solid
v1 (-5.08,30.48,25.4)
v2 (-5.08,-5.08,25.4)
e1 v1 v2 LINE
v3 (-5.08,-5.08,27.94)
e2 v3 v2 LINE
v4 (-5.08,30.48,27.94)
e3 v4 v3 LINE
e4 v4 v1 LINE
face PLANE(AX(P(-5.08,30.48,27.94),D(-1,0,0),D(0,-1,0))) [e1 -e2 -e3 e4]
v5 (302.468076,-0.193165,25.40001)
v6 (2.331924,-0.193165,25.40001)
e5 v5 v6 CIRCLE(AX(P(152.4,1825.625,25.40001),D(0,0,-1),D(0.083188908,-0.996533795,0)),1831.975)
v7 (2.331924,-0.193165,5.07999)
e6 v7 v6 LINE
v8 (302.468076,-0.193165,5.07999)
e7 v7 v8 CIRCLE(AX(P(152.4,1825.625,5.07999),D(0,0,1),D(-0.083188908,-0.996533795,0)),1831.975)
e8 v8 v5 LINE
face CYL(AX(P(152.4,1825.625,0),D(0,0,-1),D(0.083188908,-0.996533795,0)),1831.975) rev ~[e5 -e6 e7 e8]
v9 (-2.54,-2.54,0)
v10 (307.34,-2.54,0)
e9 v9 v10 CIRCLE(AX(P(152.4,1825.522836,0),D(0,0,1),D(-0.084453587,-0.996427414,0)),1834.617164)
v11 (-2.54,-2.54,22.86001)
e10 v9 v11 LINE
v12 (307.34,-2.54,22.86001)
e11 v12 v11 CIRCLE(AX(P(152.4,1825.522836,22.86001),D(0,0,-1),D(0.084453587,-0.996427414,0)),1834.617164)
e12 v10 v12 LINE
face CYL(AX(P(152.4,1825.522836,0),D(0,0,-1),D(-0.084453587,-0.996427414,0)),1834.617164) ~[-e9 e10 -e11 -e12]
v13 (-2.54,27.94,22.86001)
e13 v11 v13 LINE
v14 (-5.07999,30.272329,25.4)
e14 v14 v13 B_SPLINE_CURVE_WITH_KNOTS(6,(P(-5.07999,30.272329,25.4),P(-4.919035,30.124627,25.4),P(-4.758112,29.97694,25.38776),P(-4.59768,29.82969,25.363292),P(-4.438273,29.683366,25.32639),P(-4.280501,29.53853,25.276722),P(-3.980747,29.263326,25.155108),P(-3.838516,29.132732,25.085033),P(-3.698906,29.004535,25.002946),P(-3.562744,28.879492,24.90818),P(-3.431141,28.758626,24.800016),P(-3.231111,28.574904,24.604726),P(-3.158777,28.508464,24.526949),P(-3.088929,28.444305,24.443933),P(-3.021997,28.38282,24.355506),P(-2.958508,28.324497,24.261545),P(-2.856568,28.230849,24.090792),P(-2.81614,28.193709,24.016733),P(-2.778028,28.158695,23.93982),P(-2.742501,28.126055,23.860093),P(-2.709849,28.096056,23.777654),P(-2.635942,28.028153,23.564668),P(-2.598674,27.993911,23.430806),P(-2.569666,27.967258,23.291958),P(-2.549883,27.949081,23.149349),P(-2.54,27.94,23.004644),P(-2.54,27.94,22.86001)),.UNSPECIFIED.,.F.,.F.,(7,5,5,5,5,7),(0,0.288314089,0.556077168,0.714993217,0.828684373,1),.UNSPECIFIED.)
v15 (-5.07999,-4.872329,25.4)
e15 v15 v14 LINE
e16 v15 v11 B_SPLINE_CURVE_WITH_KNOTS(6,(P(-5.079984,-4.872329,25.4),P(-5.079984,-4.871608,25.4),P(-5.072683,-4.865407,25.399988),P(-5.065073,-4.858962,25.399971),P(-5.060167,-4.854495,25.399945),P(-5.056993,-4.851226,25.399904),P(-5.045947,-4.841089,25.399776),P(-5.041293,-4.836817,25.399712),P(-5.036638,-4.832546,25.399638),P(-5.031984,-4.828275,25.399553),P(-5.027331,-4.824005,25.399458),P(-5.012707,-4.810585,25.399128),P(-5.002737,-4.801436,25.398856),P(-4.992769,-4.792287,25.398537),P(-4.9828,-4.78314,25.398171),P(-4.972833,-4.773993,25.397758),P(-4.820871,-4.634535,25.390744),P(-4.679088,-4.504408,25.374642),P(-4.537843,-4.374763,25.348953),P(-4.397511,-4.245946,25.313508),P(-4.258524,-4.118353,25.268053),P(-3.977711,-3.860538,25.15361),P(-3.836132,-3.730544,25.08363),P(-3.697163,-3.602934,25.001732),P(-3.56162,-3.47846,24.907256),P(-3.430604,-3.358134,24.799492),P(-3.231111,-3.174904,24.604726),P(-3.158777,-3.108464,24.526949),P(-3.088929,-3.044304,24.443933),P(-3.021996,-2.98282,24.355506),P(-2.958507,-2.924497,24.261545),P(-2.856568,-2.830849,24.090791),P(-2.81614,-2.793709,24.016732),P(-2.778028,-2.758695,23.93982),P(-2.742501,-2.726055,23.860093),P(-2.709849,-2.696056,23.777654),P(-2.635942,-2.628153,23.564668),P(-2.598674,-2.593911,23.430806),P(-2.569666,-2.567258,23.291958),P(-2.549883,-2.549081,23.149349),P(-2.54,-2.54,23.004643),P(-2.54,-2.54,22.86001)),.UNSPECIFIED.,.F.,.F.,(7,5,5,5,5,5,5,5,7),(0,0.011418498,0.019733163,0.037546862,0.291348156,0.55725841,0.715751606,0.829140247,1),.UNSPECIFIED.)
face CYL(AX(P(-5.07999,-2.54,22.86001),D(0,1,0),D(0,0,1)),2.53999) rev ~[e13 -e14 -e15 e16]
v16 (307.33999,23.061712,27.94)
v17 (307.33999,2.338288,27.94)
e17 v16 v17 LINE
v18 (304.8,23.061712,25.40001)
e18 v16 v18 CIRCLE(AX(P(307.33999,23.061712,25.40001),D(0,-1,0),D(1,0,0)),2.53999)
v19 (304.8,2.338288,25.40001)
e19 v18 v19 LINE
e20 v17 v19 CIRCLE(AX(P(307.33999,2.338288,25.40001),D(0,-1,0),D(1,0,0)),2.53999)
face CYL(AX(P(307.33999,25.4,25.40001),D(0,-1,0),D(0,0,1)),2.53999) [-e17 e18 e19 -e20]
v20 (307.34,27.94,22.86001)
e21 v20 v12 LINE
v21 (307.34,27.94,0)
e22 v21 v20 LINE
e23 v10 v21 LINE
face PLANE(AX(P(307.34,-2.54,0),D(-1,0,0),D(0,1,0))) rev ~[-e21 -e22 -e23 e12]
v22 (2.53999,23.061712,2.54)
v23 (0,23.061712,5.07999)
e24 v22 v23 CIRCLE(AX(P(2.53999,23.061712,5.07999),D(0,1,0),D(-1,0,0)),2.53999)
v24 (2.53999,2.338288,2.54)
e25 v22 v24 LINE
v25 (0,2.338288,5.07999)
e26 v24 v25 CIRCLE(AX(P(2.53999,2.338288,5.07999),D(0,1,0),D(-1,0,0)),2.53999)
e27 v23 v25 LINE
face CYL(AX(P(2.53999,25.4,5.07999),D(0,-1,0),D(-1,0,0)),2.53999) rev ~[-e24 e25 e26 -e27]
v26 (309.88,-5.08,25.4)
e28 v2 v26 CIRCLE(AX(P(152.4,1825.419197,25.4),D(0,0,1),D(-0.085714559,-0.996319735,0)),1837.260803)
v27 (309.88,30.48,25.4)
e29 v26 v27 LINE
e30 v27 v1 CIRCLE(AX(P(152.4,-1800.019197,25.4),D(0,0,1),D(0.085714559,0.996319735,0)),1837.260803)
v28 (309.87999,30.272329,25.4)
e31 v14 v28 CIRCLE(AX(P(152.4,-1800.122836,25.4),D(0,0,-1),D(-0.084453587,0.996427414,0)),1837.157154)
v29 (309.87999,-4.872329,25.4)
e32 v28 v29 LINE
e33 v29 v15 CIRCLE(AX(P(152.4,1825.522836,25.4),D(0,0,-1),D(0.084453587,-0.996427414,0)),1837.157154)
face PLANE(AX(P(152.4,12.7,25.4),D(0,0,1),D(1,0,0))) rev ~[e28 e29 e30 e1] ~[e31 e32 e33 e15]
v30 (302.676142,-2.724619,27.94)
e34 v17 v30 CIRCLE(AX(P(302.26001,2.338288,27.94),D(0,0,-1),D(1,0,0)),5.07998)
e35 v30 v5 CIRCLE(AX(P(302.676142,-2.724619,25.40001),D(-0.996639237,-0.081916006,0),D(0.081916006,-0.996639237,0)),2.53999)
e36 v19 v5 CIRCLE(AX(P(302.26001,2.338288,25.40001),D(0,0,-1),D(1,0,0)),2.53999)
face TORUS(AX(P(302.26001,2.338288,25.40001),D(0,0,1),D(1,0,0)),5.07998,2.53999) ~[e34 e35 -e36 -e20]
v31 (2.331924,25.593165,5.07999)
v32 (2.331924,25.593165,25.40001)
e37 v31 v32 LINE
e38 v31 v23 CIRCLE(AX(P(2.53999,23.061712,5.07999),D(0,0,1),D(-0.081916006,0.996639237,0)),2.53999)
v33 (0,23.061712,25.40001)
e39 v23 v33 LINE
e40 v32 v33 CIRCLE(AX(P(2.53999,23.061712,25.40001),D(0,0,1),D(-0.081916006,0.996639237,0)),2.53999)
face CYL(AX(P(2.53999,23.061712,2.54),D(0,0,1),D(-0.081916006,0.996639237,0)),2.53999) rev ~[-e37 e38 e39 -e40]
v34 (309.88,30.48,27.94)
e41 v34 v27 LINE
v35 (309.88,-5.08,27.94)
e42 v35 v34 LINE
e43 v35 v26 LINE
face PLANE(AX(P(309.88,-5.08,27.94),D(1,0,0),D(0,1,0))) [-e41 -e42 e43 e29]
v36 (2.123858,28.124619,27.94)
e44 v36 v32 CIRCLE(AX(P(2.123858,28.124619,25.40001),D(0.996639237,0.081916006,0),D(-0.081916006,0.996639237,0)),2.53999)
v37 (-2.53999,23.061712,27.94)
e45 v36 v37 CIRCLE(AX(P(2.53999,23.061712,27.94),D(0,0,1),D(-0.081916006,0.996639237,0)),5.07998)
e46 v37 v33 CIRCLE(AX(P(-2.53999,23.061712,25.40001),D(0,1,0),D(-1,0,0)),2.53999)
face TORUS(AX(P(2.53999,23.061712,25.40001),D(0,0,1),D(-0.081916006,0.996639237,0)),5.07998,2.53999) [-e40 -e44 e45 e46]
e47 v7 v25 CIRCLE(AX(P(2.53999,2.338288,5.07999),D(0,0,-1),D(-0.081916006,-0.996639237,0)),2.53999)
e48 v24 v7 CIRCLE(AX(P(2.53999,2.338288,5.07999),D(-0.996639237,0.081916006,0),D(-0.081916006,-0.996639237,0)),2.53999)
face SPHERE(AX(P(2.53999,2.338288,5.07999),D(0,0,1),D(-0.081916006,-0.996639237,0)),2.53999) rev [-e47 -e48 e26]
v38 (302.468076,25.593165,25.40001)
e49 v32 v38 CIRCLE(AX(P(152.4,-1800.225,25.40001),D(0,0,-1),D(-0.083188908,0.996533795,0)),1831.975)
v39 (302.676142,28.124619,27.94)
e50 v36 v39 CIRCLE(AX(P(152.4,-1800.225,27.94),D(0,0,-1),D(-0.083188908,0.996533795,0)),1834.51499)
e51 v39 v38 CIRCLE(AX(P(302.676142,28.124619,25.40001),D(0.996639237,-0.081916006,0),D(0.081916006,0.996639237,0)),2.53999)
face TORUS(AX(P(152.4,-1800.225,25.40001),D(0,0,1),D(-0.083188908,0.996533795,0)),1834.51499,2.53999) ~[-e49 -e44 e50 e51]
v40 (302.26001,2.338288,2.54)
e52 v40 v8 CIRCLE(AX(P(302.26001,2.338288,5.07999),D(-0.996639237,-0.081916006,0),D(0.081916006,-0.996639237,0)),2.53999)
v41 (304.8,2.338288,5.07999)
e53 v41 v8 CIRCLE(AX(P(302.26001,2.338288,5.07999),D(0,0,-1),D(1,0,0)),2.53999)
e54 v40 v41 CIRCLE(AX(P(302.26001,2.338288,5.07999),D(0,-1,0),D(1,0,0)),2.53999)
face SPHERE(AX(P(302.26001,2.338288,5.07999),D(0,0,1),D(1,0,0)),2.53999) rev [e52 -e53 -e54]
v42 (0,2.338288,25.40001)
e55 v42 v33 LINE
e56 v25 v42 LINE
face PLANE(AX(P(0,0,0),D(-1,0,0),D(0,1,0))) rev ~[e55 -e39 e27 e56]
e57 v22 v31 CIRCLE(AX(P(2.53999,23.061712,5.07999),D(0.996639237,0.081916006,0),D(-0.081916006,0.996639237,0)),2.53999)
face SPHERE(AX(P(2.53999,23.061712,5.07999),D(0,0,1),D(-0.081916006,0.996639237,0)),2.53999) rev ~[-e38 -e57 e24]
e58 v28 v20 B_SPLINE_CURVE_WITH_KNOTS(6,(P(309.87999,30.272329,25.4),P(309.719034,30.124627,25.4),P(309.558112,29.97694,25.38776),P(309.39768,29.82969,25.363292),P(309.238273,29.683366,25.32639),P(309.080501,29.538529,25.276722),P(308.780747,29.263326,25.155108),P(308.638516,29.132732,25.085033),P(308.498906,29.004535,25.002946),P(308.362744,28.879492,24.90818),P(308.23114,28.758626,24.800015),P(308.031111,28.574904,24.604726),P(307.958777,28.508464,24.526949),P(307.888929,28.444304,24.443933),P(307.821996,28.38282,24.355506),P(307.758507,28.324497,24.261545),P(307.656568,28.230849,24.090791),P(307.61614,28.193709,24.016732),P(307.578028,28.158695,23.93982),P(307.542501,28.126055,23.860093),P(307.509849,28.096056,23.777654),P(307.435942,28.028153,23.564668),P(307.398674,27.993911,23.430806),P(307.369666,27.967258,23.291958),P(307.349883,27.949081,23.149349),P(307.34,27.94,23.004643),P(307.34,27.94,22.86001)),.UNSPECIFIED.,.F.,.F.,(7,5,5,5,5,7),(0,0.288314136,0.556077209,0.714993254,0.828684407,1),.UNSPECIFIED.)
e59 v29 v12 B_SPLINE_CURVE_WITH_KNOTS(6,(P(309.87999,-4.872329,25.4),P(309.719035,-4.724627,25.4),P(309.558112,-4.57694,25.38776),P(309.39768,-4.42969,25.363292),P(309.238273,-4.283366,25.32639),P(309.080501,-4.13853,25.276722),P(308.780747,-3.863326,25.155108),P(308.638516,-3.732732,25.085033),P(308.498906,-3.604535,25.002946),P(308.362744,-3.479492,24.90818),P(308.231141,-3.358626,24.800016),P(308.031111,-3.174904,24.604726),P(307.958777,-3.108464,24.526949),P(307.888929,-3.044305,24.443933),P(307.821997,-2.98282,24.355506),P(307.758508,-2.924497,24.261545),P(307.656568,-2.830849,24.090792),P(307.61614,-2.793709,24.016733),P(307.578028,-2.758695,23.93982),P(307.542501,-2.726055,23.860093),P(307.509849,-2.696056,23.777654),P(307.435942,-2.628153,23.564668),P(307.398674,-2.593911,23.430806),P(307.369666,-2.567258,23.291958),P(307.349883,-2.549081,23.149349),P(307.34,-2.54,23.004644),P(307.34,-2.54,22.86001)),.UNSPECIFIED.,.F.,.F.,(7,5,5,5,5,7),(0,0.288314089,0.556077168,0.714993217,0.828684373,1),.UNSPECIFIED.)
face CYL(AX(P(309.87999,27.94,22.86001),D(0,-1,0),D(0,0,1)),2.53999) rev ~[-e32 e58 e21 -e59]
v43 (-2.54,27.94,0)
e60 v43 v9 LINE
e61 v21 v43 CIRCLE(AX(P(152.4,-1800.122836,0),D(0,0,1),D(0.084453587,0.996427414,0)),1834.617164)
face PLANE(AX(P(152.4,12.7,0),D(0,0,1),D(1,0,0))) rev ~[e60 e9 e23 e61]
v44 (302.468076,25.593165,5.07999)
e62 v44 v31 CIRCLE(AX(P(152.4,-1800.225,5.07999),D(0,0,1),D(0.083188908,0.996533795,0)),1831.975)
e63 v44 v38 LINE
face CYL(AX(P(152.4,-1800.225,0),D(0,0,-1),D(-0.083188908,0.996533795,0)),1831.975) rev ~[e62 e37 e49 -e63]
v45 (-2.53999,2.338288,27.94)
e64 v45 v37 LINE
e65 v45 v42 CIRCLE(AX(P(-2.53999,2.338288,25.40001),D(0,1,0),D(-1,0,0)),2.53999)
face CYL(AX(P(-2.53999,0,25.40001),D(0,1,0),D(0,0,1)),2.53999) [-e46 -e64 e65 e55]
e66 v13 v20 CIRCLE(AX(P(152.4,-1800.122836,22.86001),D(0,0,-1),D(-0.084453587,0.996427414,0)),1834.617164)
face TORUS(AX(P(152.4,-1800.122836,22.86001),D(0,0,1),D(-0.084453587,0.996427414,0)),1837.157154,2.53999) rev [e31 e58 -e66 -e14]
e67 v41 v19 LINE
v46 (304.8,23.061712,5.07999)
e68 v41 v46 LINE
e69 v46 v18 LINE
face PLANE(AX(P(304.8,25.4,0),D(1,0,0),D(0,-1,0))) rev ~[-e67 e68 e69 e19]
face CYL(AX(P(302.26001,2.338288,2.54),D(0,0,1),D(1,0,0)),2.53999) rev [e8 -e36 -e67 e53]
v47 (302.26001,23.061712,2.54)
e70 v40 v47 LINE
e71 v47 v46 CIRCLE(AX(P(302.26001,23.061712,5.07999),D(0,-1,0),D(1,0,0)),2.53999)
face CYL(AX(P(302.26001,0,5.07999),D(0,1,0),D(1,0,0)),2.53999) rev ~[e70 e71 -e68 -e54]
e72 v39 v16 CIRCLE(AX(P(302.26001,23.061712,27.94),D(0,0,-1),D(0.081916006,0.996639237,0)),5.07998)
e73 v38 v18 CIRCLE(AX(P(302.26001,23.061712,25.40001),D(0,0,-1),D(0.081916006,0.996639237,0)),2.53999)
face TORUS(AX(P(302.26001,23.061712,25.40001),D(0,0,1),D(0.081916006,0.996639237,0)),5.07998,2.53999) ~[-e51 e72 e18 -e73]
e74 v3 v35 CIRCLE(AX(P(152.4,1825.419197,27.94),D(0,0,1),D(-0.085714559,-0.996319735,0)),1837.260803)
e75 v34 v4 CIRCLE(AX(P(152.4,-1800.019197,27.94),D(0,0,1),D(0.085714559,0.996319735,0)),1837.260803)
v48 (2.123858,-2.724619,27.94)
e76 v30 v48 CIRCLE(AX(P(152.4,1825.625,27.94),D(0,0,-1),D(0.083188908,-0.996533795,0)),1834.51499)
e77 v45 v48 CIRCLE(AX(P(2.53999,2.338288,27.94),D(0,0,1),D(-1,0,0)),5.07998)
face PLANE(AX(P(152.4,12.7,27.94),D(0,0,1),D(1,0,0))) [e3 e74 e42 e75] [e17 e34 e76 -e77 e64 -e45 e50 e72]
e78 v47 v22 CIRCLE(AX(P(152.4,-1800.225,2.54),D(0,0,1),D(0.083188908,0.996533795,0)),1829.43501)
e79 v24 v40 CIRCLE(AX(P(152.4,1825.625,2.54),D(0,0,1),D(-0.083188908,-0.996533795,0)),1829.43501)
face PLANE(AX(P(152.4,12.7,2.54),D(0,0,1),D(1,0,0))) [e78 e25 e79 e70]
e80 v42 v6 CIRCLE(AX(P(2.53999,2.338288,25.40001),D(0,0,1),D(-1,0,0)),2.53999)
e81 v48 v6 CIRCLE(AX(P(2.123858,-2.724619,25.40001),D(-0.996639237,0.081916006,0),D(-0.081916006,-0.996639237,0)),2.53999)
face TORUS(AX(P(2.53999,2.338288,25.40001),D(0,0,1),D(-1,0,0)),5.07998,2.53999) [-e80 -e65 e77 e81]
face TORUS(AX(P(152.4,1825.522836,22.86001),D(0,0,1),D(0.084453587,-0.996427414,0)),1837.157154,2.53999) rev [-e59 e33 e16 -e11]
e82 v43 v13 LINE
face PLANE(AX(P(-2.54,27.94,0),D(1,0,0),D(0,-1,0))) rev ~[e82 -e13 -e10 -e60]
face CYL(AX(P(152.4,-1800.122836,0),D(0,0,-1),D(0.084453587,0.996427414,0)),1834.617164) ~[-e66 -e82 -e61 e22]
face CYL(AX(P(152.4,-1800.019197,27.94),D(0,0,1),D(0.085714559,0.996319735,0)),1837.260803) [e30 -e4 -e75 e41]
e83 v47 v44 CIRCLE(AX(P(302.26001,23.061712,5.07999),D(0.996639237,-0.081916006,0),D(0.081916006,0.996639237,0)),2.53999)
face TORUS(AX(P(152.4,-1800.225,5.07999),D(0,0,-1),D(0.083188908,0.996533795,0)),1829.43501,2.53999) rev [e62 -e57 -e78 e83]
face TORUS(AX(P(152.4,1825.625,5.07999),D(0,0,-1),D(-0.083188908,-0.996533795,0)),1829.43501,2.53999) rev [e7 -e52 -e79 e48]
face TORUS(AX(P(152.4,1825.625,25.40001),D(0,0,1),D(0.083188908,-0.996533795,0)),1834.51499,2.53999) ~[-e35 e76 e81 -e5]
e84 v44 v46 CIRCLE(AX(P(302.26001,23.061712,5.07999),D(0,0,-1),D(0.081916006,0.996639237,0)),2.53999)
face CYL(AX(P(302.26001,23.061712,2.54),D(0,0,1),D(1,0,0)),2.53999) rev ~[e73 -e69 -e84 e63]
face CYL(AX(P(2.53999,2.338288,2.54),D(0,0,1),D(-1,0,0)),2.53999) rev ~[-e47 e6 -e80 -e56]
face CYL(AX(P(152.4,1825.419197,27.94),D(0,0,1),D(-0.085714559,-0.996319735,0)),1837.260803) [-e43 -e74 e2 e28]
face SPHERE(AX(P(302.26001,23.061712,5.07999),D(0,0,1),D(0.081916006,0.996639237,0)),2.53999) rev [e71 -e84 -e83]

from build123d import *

# Parameters (mm, degrees)
F1_DEPTH = 2.54
F2_DEPTH = 27.94
F4_DEPTH = 2.54
F5_R     = 2.53999


# Not quite as in the source:
# - a fillet or chamfer is up to 0.001 mm smaller than in the source, because OpenCascade refuses the exact size


with BuildPart() as f1:
    # F0 (on Top) → F1 (new body)
    with BuildSketch(Plane.XY):
        with BuildLine():
            Line((0, 25.4), (0, 0))
            ThreePointArc((0, 0), (152.4, -6.35), (304.8, 0))
            Line((304.8, 0), (304.8, 25.4))
            ThreePointArc((304.8, 25.4), (152.4, 31.75), (0, 25.4))
        make_face()
    extrude(amount=F1_DEPTH)

    # F0 (on Top) → F2 (join)
    with BuildSketch(Plane.XY):
        with BuildLine():
            Line((-2.54, 27.94), (-2.54, -2.54))
            ThreePointArc((-2.54, -2.54), (152.4, -9.0943273232), (307.34, -2.54))
            Line((307.34, -2.54), (307.34, 27.94))
            ThreePointArc((307.34, 27.94), (152.4, 34.4943273232), (-2.54, 27.94))
        make_face()
        with BuildLine():
            ThreePointArc((304.8, 0), (152.4, -6.35), (0, 0))
            Line((0, 0), (0, 25.4))
            ThreePointArc((0, 25.4), (152.4, 31.75), (304.8, 25.4))
            Line((304.8, 25.4), (304.8, 0))
        make_face(mode=Mode.SUBTRACT)
    extrude(amount=F2_DEPTH)

    # F3 (on face) → F4 (join)
    with BuildSketch(Plane.XY.offset(27.94)):
        with BuildLine():
            ThreePointArc((309.88, 30.48), (152.4, 37.2416066482), (-5.08, 30.48))
            Line((-5.08, 30.48), (-5.08, -5.08))
            ThreePointArc((-5.08, -5.08), (152.4, -11.8416066482), (309.88, -5.08))
            Line((309.88, -5.08), (309.88, 30.48))
        make_face()
        with BuildLine():
            ThreePointArc((-2.54, 27.94), (152.4, 34.4943273232), (307.34, 27.94))
            Line((307.34, 27.94), (307.34, -2.54))
            ThreePointArc((307.34, -2.54), (152.4, -9.0943273232), (-2.54, -2.54))
            Line((-2.54, -2.54), (-2.54, 27.94))
        make_face(mode=Mode.SUBTRACT)
    extrude(amount=-F4_DEPTH)

    # F5 (radius 2.54 in the source; OpenCascade refuses exactly that, so slightly less here)
    f5_edges = [f1.edges().sort_by_distance(p)[0] for p in [
        (152.4, -9.094327, 25.4),
        (307.34, 12.7, 25.4),
        (152.4, 34.494327, 25.4),
        (-2.54, 12.7, 25.4),
        (0, 25.4, 15.24),
        (152.4, 31.75, 2.54),
        (0, 12.7, 2.54),
        (0, 0, 15.24),
        (304.8, 12.7, 2.54),
        (152.4, -6.35, 2.54),
        (304.8, 25.4, 15.24),
        (304.8, 0, 15.24),
        (152.4, 31.75, 27.94),
        (0, 12.7, 27.94),
        (304.8, 12.7, 27.94),
        (152.4, -6.35, 27.94),
    ]]
    fillet(f5_edges, radius=F5_R)


solid = f1.part
